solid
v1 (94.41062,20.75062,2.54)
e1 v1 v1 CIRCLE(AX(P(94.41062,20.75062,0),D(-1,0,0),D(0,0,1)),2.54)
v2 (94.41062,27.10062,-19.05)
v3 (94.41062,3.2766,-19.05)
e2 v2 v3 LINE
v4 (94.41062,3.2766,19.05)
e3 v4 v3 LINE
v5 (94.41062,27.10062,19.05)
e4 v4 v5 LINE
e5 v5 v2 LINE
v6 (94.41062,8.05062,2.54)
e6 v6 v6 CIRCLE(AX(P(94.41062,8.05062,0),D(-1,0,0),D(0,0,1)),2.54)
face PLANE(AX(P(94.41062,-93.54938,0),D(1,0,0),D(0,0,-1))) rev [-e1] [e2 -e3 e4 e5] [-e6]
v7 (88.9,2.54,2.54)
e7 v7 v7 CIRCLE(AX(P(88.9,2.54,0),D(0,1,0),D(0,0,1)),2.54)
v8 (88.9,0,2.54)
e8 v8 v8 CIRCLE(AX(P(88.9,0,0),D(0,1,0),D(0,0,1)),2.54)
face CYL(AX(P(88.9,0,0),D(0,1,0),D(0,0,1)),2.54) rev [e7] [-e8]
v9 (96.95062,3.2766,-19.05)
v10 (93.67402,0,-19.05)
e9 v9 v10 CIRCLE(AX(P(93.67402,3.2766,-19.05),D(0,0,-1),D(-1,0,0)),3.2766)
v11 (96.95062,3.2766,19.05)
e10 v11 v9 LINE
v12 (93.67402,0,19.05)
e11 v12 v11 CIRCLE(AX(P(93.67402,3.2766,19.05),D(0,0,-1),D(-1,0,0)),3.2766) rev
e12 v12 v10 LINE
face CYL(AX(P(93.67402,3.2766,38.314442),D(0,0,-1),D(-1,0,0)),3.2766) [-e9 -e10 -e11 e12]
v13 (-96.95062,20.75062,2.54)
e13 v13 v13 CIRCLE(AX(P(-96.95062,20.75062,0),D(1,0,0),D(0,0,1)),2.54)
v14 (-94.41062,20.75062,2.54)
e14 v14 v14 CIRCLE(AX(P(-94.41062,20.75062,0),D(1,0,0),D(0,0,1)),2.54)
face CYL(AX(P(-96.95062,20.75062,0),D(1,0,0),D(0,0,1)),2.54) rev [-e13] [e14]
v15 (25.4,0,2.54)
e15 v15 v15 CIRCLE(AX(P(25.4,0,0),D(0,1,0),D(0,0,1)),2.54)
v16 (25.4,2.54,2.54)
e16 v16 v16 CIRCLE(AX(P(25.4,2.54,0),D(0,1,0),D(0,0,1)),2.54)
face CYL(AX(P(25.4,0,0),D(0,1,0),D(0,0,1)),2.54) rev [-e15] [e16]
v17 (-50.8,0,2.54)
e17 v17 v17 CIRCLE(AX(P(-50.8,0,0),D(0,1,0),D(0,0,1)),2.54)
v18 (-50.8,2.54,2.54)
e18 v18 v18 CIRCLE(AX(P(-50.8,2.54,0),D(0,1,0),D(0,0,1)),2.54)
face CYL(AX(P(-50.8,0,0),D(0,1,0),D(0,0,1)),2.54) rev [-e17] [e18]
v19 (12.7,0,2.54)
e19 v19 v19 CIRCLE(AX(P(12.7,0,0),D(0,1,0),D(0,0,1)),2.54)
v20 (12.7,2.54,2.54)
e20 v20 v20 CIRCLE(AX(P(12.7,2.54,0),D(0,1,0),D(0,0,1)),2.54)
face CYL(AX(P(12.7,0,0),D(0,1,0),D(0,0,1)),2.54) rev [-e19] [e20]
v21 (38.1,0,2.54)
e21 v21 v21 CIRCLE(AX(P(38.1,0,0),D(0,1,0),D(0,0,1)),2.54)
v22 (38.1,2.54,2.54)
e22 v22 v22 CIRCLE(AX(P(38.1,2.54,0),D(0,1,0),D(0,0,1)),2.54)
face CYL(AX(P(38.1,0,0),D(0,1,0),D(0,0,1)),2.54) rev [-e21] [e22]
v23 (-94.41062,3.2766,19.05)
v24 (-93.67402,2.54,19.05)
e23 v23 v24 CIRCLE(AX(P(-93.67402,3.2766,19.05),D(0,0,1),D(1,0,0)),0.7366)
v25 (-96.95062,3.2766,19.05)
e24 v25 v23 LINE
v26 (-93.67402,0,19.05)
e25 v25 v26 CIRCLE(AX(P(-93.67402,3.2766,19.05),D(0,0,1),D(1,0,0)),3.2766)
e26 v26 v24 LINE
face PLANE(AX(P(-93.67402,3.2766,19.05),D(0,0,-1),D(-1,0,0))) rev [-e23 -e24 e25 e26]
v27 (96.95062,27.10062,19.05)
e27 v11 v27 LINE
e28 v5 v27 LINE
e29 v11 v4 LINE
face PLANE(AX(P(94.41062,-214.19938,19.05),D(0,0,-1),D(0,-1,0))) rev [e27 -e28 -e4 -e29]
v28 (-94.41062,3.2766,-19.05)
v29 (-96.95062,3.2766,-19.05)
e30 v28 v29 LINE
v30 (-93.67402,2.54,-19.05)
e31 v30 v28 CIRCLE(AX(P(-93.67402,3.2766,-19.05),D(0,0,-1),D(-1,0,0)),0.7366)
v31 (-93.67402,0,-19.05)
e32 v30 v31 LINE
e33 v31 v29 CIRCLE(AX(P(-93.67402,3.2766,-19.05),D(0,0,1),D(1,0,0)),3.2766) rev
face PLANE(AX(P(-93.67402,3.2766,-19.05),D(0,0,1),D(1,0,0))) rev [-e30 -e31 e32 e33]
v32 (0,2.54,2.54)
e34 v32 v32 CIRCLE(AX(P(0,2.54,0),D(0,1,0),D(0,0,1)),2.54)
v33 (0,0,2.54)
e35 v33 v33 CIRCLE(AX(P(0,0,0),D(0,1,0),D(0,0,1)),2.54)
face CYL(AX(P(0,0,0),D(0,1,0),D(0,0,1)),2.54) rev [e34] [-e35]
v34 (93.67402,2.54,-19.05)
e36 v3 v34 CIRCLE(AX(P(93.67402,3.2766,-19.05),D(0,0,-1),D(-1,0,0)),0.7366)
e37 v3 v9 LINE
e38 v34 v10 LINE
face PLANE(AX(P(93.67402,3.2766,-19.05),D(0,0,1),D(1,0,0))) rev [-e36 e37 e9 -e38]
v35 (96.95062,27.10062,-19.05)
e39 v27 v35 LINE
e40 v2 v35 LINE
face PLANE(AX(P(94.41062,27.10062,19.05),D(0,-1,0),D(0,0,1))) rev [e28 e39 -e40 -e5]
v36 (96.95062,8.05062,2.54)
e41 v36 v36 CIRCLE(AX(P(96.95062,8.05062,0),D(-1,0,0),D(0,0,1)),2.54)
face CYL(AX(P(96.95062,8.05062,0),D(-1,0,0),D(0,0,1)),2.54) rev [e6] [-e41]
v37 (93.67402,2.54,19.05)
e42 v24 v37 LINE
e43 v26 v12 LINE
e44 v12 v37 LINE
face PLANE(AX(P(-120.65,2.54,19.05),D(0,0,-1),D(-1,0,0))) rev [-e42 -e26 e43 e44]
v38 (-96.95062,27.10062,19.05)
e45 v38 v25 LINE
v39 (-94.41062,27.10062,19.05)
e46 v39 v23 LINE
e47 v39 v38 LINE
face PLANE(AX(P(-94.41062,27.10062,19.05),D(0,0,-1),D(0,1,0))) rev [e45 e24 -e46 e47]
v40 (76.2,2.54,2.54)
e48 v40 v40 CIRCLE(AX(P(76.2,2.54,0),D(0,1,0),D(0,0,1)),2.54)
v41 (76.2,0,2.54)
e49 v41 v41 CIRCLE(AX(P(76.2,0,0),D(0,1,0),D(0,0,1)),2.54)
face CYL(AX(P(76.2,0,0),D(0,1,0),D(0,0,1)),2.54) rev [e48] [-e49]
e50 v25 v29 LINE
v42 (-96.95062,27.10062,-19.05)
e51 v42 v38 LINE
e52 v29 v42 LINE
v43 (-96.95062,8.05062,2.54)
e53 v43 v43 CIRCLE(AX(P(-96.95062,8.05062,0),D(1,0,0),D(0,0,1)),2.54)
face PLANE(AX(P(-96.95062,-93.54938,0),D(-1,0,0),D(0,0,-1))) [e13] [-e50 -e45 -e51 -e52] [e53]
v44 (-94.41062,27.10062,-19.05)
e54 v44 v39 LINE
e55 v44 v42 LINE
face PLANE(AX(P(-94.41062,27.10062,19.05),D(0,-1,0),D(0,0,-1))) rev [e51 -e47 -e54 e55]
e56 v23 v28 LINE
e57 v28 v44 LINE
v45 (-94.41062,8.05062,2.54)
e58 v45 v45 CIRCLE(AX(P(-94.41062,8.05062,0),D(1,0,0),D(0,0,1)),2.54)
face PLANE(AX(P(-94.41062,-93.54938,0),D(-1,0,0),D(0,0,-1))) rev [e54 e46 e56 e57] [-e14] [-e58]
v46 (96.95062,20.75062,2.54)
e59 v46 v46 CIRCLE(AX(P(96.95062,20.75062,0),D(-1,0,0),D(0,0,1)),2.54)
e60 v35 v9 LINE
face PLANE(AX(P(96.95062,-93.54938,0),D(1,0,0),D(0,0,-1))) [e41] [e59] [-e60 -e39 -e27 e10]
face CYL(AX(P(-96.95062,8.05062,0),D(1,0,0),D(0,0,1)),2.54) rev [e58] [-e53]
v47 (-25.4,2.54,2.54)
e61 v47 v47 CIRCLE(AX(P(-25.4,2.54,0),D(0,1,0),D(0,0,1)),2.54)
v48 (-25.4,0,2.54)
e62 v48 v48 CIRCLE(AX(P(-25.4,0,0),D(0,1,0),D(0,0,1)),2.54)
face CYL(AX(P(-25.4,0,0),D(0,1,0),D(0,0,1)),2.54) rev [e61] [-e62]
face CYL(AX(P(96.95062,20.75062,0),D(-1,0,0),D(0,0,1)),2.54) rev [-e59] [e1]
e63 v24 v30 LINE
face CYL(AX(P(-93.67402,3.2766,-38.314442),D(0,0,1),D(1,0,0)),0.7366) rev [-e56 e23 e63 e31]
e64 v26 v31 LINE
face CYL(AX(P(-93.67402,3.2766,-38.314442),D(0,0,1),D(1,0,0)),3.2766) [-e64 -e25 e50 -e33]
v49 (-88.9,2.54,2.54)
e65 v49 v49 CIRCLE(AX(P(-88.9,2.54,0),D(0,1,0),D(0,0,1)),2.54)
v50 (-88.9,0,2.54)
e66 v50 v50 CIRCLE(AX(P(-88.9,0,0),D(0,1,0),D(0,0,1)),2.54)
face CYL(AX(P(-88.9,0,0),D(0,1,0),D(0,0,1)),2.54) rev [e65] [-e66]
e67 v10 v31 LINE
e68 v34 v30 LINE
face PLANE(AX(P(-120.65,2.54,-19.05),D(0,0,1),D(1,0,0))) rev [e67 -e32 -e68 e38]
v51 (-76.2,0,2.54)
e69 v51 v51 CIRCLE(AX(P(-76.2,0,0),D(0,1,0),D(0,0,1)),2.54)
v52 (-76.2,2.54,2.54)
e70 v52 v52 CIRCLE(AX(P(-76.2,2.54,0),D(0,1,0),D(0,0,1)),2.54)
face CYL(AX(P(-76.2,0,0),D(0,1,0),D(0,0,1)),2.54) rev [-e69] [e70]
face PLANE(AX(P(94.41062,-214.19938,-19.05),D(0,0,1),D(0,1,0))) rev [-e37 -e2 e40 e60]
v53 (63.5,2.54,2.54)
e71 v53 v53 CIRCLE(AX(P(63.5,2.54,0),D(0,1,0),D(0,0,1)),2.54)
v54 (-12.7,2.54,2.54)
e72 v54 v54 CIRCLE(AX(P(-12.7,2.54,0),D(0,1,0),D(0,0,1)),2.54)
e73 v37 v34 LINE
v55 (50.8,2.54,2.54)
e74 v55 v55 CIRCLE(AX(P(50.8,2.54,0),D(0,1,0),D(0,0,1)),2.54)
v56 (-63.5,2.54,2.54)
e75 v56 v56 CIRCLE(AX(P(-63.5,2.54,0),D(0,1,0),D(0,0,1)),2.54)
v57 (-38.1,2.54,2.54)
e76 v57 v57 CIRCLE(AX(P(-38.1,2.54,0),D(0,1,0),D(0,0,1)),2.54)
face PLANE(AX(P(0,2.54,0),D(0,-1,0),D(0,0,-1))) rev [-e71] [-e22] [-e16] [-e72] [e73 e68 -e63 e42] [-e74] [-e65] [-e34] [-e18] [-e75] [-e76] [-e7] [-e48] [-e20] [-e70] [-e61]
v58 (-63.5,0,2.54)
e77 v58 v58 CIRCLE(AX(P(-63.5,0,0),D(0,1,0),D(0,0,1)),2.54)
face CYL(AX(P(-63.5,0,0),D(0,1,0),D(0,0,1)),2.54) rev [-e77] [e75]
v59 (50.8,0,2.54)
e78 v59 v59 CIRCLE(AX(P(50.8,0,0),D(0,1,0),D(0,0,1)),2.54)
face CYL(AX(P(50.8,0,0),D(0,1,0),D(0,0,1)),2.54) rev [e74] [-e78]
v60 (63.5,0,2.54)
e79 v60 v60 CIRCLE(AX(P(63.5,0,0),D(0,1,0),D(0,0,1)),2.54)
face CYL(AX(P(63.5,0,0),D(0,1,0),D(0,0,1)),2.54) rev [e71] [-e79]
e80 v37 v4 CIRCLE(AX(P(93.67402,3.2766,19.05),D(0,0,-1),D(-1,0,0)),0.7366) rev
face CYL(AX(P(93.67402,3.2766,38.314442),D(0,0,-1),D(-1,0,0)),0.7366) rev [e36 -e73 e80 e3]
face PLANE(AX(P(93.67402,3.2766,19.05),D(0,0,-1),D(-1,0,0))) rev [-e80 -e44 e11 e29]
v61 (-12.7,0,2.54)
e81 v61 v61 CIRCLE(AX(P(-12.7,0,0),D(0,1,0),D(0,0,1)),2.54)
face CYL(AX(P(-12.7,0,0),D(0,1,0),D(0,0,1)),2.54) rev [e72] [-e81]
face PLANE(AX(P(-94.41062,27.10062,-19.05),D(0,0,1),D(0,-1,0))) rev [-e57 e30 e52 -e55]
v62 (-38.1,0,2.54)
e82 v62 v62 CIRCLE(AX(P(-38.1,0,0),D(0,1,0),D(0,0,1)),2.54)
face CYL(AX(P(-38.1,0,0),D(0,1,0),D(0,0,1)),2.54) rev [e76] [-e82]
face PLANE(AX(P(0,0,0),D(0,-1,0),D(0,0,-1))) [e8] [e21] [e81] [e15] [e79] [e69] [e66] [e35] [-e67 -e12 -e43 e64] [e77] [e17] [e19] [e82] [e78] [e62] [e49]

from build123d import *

# Parameters (mm, degrees)
SKETCH1_W                  = 241.3
SKETCH1_H                  = 38.1
BOSS_EXTRUDE1_DEPTH        = 2.54
SKETCH2_R                  = 2.54
CUT_EXTRUDE1_DEPTH         = 2.54
LPATTERN1_COUNT            = 19
LPATTERN1_PITCH            = 12.7
SKETCHED_START             = -120.65
SKETCHED_BEND2_OUTLINE_W   = 2.54
SKETCHED_BEND2_OUTLINE_H   = 38.1
SKETCHED_BEND2_DEPTH       = 23.699379955
SKETCHED_START_2           = -96.631937929
SKETCHED_BEND2_2_OUTLINE_W = 24.560620045
SKETCHED_BEND2_2_OUTLINE_H = 38.1
SKETCHED_BEND2_2_OUTLINE_R = 2.54
SKETCHED_BEND2_2_DEPTH     = 2.221317884
SKETCHED_START_3           = -96.950620045
SKETCHED_BEND2_3_OUTLINE_W = 24.560620045
SKETCHED_BEND2_3_OUTLINE_H = 38.1
SKETCHED_BEND2_3_OUTLINE_R = 2.54
SKETCHED_BEND2_3_DEPTH     = 3.2766
SKETCHED_START_4           = -20
SKETCHED_BEND2_4_DEPTH     = 40
SKETCHED_START_5           = 96.950620045
SKETCHED_BEND3_OUTLINE_W   = 2.54
SKETCHED_BEND3_OUTLINE_H   = 38.1
SKETCHED_BEND3_DEPTH       = 23.699379955
SKETCHED_START_6           = 94.410620045
SKETCHED_BEND3_2_OUTLINE_W = 24.560620045
SKETCHED_BEND3_2_OUTLINE_H = 38.1
SKETCHED_BEND3_2_OUTLINE_R = 2.54
SKETCHED_BEND3_2_DEPTH     = 2.221317884
SKETCHED_START_7           = 93.674020045
SKETCHED_BEND3_3_OUTLINE_W = 24.560620045
SKETCHED_BEND3_3_OUTLINE_H = 38.1
SKETCHED_BEND3_3_OUTLINE_R = 2.54
SKETCHED_BEND3_3_DEPTH     = 3.2766
SKETCHED_BEND3_4_DEPTH     = 40


with BuildPart() as part:
    # Sketch1 → Boss-Extrude1 (new body)
    with BuildSketch(Plane(origin=(0, 0, 0), x_dir=(1, 0, 0), z_dir=(0, 1, 0))):
        Rectangle(SKETCH1_W, SKETCH1_H)
    extrude(amount=BOSS_EXTRUDE1_DEPTH)

    # Sketch2 → Cut-Extrude1 (cut)
    with BuildSketch(Plane(origin=(0, 2.54, 0), x_dir=(1, 0, 0), z_dir=(0, 1, 0))):
        with Locations(Location((-114.3, 0, 0), (0, 0, 270))):
            Circle(SKETCH2_R)
    cut_extrude1 = extrude(amount=-CUT_EXTRUDE1_DEPTH, mode=Mode.SUBTRACT)

    # LPattern1: Cut-Extrude1 ×19
    with Locations(*[(i * LPATTERN1_PITCH, 0, 0) for i in range(1, LPATTERN1_COUNT)]):
        add(cut_extrude1, mode=Mode.SUBTRACT)

    # Sketched Bend2: read off the stored shape, not the designer's step
    # Sketched Bend2 outline → Sketched Bend2 (cut)
    with BuildSketch(Plane.YZ.offset(SKETCHED_START)):
        with Locations((1.27, 0)):
            Rectangle(SKETCHED_BEND2_OUTLINE_W, SKETCHED_BEND2_OUTLINE_H)
    extrude(amount=SKETCHED_BEND2_DEPTH, mode=Mode.SUBTRACT)

    # Sketched Bend2 2 outline → Sketched Bend2 2 (add)
    with BuildSketch(Plane.YZ.offset(SKETCHED_START_2)):
        with Locations((14.820310023, 0)):
            Rectangle(SKETCHED_BEND2_2_OUTLINE_W, SKETCHED_BEND2_2_OUTLINE_H)
        with Locations((8.050620045, 0)):
            Circle(SKETCHED_BEND2_2_OUTLINE_R, mode=Mode.SUBTRACT)
        with Locations((20.750620045, 0)):
            Circle(SKETCHED_BEND2_2_OUTLINE_R, mode=Mode.SUBTRACT)
    extrude(amount=SKETCHED_BEND2_2_DEPTH)

    # Sketched Bend2 3 outline → Sketched Bend2 3 (add)
    with BuildSketch(Plane.YZ.offset(SKETCHED_START_3)):
        with Locations((14.820310023, 0)):
            Rectangle(SKETCHED_BEND2_3_OUTLINE_W, SKETCHED_BEND2_3_OUTLINE_H)
        with Locations((8.050620045, 0)):
            Circle(SKETCHED_BEND2_3_OUTLINE_R, mode=Mode.SUBTRACT)
        with Locations((20.750620045, 0)):
            Circle(SKETCHED_BEND2_3_OUTLINE_R, mode=Mode.SUBTRACT)
    extrude(amount=SKETCHED_BEND2_3_DEPTH)

    # Sketched Bend2 4 outline → Sketched Bend2 4 (cut)
    with BuildSketch(Plane.XY.offset(SKETCHED_START_4)):
        with BuildLine():
            Line((-93.674020045, 27.100620045), (-94.410620045, 27.100620045))
            Line((-94.410620045, 27.100620045), (-94.410620045, 3.2766))
            ThreePointArc((-94.410620045, 3.2766), (-94.1948749, 2.755745145), (-93.674020045, 2.54))
            Line((-93.674020045, 2.54), (-93.674020045, 27.100620045))
        make_face()
        with BuildLine():
            ThreePointArc((-93.674020045, 0), (-95.990926125, 0.95969392), (-96.950620045, 3.2766))
            Line((-96.950620045, 3.2766), (-96.950620045, 0))
            Line((-96.950620045, 0), (-93.674020045, 0))
        make_face()
    extrude(amount=SKETCHED_BEND2_4_DEPTH, mode=Mode.SUBTRACT)

    # Sketched Bend3: read off the stored shape, not the designer's step
    # Sketched Bend3 outline → Sketched Bend3 (cut)
    with BuildSketch(Plane.YZ.offset(SKETCHED_START_5)):
        with Locations((1.27, 0)):
            Rectangle(SKETCHED_BEND3_OUTLINE_W, SKETCHED_BEND3_OUTLINE_H)
    extrude(amount=SKETCHED_BEND3_DEPTH, mode=Mode.SUBTRACT)

    # Sketched Bend3 2 outline → Sketched Bend3 2 (add)
    with BuildSketch(Plane.YZ.offset(SKETCHED_START_6)):
        with Locations((14.820310023, 0)):
            Rectangle(SKETCHED_BEND3_2_OUTLINE_W, SKETCHED_BEND3_2_OUTLINE_H)
        with Locations((8.050620045, 0)):
            Circle(SKETCHED_BEND3_2_OUTLINE_R, mode=Mode.SUBTRACT)
        with Locations((20.750620045, 0)):
            Circle(SKETCHED_BEND3_2_OUTLINE_R, mode=Mode.SUBTRACT)
    extrude(amount=SKETCHED_BEND3_2_DEPTH)

    # Sketched Bend3 3 outline → Sketched Bend3 3 (add)
    with BuildSketch(Plane.YZ.offset(SKETCHED_START_7)):
        with Locations((14.820310023, 0)):
            Rectangle(SKETCHED_BEND3_3_OUTLINE_W, SKETCHED_BEND3_3_OUTLINE_H)
        with Locations((8.050620045, 0)):
            Circle(SKETCHED_BEND3_3_OUTLINE_R, mode=Mode.SUBTRACT)
        with Locations((20.750620045, 0)):
            Circle(SKETCHED_BEND3_3_OUTLINE_R, mode=Mode.SUBTRACT)
    extrude(amount=SKETCHED_BEND3_3_DEPTH)

    # Sketched Bend3 4 outline → Sketched Bend3 4 (cut)
    with BuildSketch(Plane.XY.offset(SKETCHED_START_4)):
        with BuildLine():
            Line((96.950620045, 0), (96.950620045, 3.2766))
            ThreePointArc((96.950620045, 3.2766), (95.990926125, 0.95969392), (93.674020045, 0))
            Line((93.674020045, 0), (96.950620045, 0))
        make_face()
        with BuildLine():
            ThreePointArc((93.674020045, 2.54), (94.1948749, 2.755745145), (94.410620045, 3.2766))
            Line((94.410620045, 3.2766), (94.410620045, 27.100620045))
            Line((94.410620045, 27.100620045), (93.674020045, 27.100620045))
            Line((93.674020045, 27.100620045), (93.674020045, 2.54))
        make_face()
    extrude(amount=SKETCHED_BEND3_4_DEPTH, mode=Mode.SUBTRACT)


solid = part.part
